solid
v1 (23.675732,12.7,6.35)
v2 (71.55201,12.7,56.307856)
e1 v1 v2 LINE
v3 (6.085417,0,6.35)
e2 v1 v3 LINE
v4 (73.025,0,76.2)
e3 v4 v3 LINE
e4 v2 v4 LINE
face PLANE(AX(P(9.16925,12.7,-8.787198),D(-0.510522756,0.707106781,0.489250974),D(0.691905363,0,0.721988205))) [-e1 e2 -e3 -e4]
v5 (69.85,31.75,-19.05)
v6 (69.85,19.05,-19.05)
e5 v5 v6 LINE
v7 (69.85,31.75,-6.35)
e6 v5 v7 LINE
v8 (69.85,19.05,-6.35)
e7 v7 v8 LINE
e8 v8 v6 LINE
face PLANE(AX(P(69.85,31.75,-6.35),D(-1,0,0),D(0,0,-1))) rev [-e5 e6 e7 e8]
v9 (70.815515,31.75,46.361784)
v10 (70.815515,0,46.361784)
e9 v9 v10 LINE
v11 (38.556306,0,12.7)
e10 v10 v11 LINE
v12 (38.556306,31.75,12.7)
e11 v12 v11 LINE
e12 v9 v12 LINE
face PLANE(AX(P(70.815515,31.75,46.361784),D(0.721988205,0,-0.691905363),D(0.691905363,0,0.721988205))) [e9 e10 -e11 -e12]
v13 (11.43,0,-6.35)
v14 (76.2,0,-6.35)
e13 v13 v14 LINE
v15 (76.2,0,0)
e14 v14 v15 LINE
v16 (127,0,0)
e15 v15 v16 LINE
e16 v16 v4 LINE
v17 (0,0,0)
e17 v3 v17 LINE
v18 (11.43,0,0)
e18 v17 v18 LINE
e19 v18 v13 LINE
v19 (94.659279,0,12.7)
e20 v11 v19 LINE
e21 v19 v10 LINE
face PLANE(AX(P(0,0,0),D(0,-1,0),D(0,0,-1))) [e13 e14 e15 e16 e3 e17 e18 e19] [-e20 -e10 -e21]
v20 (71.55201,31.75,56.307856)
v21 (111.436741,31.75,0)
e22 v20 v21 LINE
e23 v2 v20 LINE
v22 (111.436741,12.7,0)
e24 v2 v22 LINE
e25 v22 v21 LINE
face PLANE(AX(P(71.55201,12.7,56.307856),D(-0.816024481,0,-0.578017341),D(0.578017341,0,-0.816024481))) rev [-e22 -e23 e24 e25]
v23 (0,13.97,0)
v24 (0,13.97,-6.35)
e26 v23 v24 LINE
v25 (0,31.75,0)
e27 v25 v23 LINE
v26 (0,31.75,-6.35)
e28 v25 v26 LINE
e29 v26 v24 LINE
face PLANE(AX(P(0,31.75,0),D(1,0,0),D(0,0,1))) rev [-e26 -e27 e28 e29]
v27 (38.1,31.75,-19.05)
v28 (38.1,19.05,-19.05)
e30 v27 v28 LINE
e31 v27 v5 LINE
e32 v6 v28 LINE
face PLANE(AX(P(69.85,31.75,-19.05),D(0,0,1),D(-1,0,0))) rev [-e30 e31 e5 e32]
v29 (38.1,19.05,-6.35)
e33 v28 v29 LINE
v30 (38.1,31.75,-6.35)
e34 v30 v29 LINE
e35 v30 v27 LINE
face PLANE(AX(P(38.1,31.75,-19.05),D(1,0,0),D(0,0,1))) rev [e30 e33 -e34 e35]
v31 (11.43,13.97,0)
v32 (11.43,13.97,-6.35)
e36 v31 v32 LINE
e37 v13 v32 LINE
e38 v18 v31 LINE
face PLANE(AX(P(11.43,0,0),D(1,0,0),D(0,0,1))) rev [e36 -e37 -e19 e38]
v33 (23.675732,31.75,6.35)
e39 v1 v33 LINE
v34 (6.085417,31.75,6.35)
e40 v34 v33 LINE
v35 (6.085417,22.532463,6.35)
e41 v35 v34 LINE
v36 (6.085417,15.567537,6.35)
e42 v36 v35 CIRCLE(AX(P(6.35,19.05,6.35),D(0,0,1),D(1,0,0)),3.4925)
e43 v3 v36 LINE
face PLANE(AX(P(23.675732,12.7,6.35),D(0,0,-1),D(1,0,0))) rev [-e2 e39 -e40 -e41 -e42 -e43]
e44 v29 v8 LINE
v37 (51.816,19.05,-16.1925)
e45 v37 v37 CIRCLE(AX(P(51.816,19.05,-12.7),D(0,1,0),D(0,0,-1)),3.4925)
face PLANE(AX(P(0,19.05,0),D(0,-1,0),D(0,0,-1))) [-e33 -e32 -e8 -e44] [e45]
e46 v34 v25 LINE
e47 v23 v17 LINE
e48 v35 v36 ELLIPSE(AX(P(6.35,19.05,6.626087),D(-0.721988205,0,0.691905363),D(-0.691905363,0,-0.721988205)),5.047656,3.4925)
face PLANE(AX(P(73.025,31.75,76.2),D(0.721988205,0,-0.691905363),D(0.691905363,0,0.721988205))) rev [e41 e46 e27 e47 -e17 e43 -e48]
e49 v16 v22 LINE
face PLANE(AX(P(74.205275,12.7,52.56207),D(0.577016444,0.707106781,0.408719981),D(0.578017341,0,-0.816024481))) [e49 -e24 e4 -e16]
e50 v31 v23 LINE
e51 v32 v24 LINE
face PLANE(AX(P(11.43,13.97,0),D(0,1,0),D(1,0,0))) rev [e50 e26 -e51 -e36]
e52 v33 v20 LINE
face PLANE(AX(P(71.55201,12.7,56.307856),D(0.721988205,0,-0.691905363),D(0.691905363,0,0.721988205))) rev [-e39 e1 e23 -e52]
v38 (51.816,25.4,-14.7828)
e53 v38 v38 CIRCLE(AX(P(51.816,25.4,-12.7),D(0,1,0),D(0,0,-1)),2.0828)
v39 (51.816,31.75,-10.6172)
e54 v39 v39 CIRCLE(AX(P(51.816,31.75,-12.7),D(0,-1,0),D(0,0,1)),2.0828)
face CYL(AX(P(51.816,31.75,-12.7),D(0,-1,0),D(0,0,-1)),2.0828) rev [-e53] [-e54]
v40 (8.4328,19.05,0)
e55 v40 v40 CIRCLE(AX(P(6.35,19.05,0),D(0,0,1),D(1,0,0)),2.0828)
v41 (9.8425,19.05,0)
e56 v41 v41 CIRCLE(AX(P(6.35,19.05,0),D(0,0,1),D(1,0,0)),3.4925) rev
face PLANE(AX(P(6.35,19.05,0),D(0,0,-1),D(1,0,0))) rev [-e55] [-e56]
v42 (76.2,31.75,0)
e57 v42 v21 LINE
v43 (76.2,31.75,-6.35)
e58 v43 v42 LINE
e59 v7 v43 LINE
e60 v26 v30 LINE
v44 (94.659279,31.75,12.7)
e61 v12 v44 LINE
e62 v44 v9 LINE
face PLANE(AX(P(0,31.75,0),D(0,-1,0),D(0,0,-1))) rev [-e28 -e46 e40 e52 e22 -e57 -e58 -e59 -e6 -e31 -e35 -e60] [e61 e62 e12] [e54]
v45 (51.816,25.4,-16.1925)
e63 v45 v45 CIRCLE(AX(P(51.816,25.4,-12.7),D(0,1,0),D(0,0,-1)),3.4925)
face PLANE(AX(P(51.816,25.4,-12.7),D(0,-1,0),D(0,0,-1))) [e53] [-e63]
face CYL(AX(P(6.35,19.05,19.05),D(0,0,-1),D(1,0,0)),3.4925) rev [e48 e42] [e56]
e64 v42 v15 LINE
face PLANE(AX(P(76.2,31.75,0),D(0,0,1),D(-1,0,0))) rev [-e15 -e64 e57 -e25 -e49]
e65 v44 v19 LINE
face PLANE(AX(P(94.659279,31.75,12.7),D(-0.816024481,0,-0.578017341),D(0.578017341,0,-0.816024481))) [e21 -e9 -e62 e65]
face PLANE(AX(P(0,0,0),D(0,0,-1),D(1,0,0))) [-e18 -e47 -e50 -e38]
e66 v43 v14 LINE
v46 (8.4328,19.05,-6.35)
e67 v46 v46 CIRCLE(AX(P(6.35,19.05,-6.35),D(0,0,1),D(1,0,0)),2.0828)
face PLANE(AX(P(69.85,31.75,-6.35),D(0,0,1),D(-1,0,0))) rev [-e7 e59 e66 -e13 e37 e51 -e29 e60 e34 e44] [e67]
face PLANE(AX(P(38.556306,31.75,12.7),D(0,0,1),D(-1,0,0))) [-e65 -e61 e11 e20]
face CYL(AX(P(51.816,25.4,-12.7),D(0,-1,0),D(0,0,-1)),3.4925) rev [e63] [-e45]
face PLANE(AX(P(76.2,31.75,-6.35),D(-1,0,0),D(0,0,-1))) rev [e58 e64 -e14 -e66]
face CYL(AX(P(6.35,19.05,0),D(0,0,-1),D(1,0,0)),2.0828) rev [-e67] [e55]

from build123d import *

# Parameters (mm, degrees)
SKETCH2_R           = 2.0828
BOSS_EXTRUDE1_DEPTH = 31.75
SKETCH4_W           = 31.75
SKETCH4_H           = 12.7
CUT_EXTRUDE1_DEPTH  = 19.05
SKETCH5_R           = 3.4925
CUT_EXTRUDE2_DEPTH  = 6.35
CUT_EXTRUDE6_DEPTH  = 19.05
CHAMFER5_SIZE       = 12.7
CHAMFER7_SIZE       = 12.7
SKETCH6_R           = 3.4925
CUT_EXTRUDE8_DEPTH  = 25.4
SKETCH15_R          = 3.4925
SKETCH15_R_2        = 2.0828
BOSS_EXTRUDE2_DEPTH = 6.35
SKETCH14_W          = 11.43
SKETCH14_H          = 13.97
CUT_EXTRUDE10_DEPTH = 6.35


with BuildPart() as part:
    # Sketch2 → Boss-Extrude1 (new body)
    with BuildSketch(Plane(origin=(0, 0, 0), x_dir=(1, 0, 0), z_dir=(0, 1, 0))):
        Polygon((-69.85, 6.35), (-76.2, 6.35), (-76.2, 0), (-127, 0), (-73.025, -76.2), (0, 0), (0, 6.35), (-38.1, 6.35), (-38.1, 19.05), (-69.85, 19.05), align=None)
        with Locations(Location((-51.816, 12.7, 0), (0, 0, 270))):
            Circle(SKETCH2_R, mode=Mode.SUBTRACT)
        Polygon((-38.556305928, -12.7), (-69.85, -12.7), (-76.2, -12.7), (-94.65927881, -12.7), (-70.815515335, -46.361783729), align=None, mode=Mode.SUBTRACT)
    extrude(amount=BOSS_EXTRUDE1_DEPTH)

    # Sketch4 → Cut-Extrude1 (cut)
    with BuildSketch(Plane.XZ):
        with Locations((-53.975, -12.7)):
            Rectangle(SKETCH4_W, SKETCH4_H)
    extrude(amount=-CUT_EXTRUDE1_DEPTH, mode=Mode.SUBTRACT)

    # Sketch5 → Cut-Extrude2 (cut)
    with BuildSketch(Plane(origin=(0, 19.05, 0), x_dir=(-1, 0, 0), z_dir=(0, -1, 0))):
        with Locations(Location((51.816, 12.7, 0), (0, 0, 90))):
            Circle(SKETCH5_R)
    extrude(amount=-CUT_EXTRUDE2_DEPTH, mode=Mode.SUBTRACT)

    # Sketch3 → Cut-Extrude6 (cut)
    with BuildSketch(Plane(origin=(0, 31.75, 0), x_dir=(1, 0, 0), z_dir=(0, 1, 0))):
        Polygon((-127, 0), (-73.025, -76.2), (-6.085416667, -6.35), (-23.67573173, -6.35), (-71.552010223, -56.307855819), (-111.436741429, 0), align=None)
    extrude(amount=-CUT_EXTRUDE6_DEPTH, mode=Mode.SUBTRACT)

    # Chamfer5
    chamfer5_edges = [part.edges().sort_by_distance(p)[0] for p in [
        (-39.555208333, 12.7, 41.275),
    ]]
    chamfer(chamfer5_edges, length=CHAMFER5_SIZE - 0.0001)  # a hair under: the kernel refuses the full size

    # Chamfer7
    chamfer7_edges = [part.edges().sort_by_distance(p)[0] for p in [
        (-103.750412518, 12.7, 32.822947033),
    ]]
    chamfer(chamfer7_edges, length=CHAMFER7_SIZE - 0.0001)  # a hair under: the kernel refuses the full size

    # Sketch6 → Cut-Extrude8 (cut)
    with BuildSketch(Plane(origin=(0, 0, -6.35), x_dir=(-1, 0, 0), z_dir=(0, 0, -1))):
        with Locations((6.35, 19.05)):
            Circle(SKETCH6_R)
    extrude(amount=-CUT_EXTRUDE8_DEPTH, mode=Mode.SUBTRACT)

    # Sketch15 → Boss-Extrude2 (add)
    with BuildSketch(Plane(origin=(0, 0, -6.35), x_dir=(-1, 0, 0), z_dir=(0, 0, -1))):
        with Locations((6.35, 19.05)):
            Circle(SKETCH15_R)
        with Locations((6.35, 19.05)):
            Circle(SKETCH15_R_2, mode=Mode.SUBTRACT)
    extrude(amount=-BOSS_EXTRUDE2_DEPTH)

    # Sketch14 → Cut-Extrude10 (cut)
    with BuildSketch(Plane(origin=(0, 0, -6.35), x_dir=(-1, 0, 0), z_dir=(0, 0, -1))):
        with Locations((5.715, 6.985)):
            Rectangle(SKETCH14_W, SKETCH14_H)
    extrude(amount=-CUT_EXTRUDE10_DEPTH, mode=Mode.SUBTRACT)


with BuildPart() as body_2:
    # Mirror1: mirrored copy
    add(part.part.mirror(Plane(origin=(0, 31.75, 0), x_dir=(0, 0, 1), z_dir=(-1, 0, 0))))


solid = body_2.part
